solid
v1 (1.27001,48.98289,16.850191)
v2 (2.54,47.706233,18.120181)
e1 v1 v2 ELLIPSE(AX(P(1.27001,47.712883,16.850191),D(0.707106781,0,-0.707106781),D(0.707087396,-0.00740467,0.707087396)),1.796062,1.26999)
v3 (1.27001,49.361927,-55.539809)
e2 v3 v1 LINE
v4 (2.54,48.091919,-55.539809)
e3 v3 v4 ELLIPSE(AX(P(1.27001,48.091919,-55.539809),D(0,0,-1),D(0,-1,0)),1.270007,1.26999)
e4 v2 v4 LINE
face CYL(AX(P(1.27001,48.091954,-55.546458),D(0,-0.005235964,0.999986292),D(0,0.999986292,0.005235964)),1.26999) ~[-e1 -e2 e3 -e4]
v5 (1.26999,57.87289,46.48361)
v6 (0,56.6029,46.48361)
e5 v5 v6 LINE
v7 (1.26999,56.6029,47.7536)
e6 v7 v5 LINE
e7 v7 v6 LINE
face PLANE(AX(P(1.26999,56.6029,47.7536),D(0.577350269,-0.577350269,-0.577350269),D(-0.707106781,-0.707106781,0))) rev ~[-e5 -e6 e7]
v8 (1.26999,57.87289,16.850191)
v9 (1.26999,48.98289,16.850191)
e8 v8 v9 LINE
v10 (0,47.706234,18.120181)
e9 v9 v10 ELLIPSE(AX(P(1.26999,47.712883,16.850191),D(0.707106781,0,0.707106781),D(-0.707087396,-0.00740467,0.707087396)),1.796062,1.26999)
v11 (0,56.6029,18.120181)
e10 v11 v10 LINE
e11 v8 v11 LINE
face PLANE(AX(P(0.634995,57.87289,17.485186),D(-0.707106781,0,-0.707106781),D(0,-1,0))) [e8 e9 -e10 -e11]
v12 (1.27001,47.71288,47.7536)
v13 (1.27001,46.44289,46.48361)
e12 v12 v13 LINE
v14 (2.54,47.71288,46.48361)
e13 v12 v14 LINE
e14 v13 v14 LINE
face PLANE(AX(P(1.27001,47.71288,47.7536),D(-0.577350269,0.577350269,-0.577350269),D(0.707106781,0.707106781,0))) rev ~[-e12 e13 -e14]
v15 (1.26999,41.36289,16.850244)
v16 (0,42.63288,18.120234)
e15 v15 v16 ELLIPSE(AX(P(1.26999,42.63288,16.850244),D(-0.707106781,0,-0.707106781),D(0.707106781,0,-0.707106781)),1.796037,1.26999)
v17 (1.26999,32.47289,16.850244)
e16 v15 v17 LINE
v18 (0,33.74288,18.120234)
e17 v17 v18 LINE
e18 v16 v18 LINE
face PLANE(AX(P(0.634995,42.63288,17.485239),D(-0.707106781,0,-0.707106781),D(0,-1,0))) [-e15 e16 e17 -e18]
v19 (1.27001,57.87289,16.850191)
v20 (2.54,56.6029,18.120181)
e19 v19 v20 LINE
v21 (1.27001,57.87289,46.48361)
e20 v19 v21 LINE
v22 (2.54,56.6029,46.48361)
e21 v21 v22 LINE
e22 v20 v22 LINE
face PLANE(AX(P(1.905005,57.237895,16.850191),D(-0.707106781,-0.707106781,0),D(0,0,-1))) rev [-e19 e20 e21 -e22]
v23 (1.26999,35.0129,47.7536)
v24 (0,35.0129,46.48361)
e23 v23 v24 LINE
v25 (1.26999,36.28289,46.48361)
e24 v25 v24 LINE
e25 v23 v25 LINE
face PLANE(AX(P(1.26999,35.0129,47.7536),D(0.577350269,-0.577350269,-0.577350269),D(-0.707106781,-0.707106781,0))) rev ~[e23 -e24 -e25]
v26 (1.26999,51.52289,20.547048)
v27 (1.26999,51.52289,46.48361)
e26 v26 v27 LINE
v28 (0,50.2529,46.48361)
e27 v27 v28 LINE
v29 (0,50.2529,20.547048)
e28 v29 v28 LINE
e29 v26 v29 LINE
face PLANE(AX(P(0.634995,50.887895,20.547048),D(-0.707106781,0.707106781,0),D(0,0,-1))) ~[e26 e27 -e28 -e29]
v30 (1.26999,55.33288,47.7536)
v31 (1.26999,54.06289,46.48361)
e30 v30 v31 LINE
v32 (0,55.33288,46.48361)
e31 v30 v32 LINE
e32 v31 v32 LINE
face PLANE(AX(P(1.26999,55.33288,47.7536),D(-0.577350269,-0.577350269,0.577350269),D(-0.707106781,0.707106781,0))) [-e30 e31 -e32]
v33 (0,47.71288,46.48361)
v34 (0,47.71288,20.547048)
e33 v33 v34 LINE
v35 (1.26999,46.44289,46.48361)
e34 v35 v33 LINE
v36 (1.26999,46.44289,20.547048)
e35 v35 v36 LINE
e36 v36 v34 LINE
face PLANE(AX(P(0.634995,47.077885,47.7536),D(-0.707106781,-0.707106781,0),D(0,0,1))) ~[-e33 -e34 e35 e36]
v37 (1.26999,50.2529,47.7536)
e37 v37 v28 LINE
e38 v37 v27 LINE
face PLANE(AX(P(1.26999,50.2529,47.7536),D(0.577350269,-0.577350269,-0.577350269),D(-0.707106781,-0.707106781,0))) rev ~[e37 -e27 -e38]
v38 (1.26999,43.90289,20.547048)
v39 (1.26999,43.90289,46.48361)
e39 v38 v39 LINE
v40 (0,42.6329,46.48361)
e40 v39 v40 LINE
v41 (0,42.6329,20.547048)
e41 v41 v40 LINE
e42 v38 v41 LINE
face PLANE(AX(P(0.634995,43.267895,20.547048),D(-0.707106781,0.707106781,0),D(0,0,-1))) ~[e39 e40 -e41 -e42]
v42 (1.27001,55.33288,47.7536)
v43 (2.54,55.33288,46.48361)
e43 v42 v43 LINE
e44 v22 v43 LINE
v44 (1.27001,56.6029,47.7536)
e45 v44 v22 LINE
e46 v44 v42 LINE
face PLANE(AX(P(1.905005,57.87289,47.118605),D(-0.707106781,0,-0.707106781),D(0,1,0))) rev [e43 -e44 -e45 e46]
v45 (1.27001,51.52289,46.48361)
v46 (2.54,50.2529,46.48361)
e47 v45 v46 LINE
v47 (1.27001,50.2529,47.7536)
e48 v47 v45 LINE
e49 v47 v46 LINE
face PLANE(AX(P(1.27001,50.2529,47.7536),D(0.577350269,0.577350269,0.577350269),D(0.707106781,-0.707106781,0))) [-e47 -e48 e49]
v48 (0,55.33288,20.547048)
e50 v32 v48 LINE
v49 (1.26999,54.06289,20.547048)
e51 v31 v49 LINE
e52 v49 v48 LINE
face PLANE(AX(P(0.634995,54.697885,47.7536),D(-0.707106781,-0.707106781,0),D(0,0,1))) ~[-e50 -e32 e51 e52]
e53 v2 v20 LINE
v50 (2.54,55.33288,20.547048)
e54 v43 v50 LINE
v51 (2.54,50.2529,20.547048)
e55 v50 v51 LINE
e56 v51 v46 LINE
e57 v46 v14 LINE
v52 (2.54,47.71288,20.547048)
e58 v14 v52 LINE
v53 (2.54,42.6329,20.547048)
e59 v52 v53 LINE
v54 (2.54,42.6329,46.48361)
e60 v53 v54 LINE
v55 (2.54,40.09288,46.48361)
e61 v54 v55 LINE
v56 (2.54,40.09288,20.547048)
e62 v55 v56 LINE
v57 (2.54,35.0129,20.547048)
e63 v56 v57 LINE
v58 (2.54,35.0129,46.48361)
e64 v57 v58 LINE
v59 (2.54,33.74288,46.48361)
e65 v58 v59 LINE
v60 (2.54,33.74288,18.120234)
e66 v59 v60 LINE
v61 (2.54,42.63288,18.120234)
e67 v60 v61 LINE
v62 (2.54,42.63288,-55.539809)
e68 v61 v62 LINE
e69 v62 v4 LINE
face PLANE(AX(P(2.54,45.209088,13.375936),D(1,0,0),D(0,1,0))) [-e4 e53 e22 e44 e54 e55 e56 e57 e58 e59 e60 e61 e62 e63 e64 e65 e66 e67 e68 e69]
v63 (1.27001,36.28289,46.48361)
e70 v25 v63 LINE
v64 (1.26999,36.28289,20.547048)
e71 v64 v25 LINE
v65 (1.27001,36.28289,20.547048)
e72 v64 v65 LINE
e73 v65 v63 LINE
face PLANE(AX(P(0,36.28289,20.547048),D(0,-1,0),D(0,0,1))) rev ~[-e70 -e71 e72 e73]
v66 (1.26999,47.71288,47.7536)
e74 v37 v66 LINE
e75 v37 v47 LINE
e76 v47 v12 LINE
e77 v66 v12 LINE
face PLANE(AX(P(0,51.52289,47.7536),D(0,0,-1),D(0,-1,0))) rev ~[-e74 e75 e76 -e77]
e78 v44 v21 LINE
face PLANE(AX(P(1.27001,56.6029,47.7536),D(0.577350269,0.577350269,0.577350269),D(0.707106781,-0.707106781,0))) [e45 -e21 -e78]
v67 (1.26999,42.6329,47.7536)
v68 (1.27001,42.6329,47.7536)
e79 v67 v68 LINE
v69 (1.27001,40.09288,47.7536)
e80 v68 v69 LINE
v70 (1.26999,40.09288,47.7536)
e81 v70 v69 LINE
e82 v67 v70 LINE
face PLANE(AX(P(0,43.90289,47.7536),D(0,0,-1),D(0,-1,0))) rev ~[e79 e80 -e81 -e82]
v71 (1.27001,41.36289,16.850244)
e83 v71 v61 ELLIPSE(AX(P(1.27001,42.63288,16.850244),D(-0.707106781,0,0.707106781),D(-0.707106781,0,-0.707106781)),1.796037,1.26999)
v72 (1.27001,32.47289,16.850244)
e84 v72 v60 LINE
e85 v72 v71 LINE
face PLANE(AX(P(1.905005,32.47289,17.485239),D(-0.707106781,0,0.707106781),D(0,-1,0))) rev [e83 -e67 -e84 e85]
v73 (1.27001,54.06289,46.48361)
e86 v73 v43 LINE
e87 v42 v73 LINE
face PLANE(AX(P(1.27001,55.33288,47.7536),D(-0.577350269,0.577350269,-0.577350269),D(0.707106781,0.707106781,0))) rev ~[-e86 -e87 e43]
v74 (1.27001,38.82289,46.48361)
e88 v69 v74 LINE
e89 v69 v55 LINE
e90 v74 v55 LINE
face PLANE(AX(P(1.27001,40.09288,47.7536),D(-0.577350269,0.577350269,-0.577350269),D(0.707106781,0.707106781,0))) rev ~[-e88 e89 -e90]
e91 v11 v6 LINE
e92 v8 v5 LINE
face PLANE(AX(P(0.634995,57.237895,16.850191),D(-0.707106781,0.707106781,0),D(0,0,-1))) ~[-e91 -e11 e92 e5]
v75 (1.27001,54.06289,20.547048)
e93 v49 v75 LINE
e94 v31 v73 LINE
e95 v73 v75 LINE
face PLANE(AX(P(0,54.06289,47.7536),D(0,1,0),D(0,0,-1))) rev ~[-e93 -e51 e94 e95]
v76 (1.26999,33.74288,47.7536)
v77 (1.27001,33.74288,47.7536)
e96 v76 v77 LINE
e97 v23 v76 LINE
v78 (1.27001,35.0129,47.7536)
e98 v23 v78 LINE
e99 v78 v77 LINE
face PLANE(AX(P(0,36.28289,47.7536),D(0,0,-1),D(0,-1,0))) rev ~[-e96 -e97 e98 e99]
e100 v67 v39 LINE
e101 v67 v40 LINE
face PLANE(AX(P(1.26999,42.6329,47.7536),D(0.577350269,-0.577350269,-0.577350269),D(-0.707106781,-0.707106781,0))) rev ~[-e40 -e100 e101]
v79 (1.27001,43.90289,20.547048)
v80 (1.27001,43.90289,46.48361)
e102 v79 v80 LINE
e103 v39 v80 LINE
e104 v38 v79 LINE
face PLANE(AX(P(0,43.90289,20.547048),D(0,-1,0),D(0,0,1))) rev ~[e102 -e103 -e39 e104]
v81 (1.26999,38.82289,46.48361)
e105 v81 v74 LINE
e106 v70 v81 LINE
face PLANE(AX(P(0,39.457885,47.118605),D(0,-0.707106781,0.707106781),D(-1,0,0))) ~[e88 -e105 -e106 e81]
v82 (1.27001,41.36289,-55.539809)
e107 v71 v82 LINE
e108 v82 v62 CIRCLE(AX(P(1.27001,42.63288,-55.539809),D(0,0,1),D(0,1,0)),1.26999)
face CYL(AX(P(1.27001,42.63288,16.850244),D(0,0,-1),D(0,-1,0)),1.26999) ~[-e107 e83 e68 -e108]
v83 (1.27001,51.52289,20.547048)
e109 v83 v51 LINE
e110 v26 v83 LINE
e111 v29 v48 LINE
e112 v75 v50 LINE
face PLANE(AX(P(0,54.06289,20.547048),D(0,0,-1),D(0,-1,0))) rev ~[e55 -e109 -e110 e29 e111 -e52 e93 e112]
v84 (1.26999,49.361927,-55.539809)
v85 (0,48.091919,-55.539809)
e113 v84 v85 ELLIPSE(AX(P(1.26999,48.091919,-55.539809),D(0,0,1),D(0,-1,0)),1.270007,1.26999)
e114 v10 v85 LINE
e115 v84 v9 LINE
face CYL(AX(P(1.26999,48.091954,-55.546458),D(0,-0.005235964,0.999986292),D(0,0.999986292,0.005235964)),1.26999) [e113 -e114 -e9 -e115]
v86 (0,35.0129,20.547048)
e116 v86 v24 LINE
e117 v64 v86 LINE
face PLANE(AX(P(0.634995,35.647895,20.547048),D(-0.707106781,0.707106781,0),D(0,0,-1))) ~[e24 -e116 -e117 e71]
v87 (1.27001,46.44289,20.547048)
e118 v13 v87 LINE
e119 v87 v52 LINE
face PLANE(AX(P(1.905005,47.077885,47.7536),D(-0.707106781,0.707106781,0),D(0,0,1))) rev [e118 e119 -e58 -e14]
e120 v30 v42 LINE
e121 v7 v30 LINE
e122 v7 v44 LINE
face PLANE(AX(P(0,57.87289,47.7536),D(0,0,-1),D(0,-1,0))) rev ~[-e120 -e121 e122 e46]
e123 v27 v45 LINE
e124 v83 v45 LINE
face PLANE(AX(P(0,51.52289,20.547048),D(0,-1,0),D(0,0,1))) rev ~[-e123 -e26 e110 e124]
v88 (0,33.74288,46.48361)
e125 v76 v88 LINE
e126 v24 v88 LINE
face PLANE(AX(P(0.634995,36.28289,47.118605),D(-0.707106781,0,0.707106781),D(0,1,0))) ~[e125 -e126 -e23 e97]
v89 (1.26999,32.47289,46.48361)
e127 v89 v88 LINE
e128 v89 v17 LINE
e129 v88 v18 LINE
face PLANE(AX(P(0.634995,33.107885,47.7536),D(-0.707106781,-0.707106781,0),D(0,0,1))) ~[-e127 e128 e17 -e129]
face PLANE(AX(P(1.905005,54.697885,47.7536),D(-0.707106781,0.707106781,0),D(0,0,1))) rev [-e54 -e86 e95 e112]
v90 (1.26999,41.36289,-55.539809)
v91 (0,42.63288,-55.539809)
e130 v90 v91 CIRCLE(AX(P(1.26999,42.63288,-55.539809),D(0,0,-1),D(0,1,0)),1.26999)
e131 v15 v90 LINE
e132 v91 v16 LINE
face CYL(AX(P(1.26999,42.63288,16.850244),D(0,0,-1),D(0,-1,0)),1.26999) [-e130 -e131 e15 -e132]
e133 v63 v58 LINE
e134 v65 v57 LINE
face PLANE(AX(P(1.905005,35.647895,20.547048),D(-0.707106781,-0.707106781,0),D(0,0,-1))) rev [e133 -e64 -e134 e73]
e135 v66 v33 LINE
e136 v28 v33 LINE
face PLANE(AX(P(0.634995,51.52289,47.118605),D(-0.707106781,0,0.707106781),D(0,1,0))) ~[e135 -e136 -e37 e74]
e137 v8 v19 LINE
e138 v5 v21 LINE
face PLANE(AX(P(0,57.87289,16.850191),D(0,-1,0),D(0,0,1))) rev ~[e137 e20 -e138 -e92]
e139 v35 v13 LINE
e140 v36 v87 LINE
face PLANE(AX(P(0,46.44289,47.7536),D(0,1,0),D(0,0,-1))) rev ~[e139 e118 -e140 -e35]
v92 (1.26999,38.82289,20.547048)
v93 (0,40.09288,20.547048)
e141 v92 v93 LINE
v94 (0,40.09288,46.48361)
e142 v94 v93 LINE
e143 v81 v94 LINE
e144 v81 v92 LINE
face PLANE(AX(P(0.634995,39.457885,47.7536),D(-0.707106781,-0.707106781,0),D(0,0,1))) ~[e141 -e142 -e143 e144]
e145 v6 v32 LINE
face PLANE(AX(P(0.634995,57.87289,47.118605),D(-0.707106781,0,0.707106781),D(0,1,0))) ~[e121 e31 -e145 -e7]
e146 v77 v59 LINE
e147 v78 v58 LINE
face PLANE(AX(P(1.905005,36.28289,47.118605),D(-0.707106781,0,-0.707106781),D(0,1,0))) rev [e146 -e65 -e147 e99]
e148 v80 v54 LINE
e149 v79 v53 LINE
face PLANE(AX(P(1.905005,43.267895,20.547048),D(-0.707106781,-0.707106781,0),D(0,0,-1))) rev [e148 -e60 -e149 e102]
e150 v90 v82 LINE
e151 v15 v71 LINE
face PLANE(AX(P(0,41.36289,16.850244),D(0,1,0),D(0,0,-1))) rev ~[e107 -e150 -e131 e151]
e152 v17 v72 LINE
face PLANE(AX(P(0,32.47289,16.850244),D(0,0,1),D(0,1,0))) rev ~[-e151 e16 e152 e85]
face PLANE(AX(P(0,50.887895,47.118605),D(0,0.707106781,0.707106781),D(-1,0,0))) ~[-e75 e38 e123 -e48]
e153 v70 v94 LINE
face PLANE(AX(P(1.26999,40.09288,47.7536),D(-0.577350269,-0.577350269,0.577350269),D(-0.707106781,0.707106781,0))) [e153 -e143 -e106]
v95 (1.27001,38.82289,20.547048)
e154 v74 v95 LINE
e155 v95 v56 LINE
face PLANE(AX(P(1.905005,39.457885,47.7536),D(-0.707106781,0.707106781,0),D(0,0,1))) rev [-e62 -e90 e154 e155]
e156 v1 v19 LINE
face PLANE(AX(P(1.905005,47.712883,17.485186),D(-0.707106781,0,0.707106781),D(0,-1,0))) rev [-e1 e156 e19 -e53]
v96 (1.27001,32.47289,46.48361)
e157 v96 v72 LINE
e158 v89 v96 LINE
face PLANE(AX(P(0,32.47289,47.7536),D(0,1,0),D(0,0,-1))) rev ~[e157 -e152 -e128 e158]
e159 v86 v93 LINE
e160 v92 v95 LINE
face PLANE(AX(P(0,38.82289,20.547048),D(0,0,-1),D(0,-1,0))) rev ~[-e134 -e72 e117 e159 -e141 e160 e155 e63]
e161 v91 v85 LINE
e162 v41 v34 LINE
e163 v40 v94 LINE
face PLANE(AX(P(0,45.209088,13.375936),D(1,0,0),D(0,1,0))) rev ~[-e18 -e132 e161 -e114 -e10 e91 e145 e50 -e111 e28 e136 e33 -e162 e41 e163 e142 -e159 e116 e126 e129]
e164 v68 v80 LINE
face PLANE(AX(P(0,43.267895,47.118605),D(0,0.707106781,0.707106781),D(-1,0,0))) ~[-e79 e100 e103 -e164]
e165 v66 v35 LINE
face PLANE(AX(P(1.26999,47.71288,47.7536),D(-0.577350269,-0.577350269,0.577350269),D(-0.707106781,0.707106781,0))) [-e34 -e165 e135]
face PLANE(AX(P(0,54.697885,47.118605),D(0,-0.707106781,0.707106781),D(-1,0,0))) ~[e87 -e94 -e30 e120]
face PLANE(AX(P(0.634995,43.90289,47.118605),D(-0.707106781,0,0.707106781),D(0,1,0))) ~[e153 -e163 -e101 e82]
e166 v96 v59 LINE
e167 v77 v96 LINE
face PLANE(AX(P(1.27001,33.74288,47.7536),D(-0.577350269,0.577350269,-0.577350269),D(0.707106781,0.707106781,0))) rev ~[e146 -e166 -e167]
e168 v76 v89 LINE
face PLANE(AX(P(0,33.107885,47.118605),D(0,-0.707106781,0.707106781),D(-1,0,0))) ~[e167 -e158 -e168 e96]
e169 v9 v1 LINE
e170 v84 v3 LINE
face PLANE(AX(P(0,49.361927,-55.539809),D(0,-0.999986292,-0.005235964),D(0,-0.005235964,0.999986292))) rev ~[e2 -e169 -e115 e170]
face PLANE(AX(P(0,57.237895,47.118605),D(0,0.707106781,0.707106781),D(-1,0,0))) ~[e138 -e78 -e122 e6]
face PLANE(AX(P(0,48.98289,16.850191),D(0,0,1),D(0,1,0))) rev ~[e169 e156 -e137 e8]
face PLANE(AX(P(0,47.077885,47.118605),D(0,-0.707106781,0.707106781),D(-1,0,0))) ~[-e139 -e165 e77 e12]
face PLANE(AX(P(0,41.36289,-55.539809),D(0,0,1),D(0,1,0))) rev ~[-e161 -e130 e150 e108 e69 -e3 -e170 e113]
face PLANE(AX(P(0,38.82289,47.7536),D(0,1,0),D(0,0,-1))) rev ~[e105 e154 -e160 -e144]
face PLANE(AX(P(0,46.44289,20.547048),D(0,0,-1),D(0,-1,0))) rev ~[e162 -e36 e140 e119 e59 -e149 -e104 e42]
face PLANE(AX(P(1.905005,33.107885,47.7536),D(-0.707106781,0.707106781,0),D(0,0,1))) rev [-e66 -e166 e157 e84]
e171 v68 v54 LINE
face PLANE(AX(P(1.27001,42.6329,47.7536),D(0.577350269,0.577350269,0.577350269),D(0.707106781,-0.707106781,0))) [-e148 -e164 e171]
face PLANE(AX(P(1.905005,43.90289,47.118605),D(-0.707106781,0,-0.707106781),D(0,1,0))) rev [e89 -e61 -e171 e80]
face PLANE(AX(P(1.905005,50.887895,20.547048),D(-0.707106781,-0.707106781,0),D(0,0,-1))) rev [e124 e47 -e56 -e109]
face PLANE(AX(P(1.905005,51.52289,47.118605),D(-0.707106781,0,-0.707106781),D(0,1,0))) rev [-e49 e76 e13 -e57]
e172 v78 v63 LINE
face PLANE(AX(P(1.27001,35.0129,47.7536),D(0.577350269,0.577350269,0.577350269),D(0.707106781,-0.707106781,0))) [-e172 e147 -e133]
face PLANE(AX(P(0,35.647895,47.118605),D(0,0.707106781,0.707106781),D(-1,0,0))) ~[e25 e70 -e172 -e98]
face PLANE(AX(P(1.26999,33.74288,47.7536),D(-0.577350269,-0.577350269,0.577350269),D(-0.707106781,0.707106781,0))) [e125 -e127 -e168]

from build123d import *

# Parameters (mm, degrees)
F1_DEPTH = 2.54
F2_R     = 1.26999
F3_SIZE  = 1.26999


# Not quite as in the source:
# - a fillet or chamfer is up to 0.001 mm smaller than in the source, because OpenCascade refuses the exact size


with BuildPart() as f1:
    # F0 (on Right) → F1 (new body)
    with BuildSketch(Plane.YZ):
        Polygon((41.3628902497, -55.5398087384), (48.9828902497, -55.5398087384), (49.3619268672, -55.5398087384), (48.9828902497, 16.8501912616), (57.8728902497, 16.8501912616), (57.8728902497, 20.5470483008), (57.8728902497, 47.7535999747), (54.0628902497, 47.7535999747), (54.0628902497, 20.5470483008), (51.5228902497, 20.5470483008), (51.5228902497, 47.7535999747), (46.4428902497, 47.7535999747), (46.4428902497, 20.5470483008), (43.9028902497, 20.5470483008), (43.9028902497, 47.7535999747), (38.8228902497, 47.7535999747), (38.8228902497, 20.5470483008), (36.2828902497, 20.5470483008), (36.2828902497, 47.7535999747), (32.4728902497, 47.7535999747), (32.4728902497, 16.8502441253), (41.3628902497, 16.8502441253), align=None)
    extrude(amount=F1_DEPTH)

    # F2 (radius 1.27 in the source; OpenCascade refuses exactly that, so slightly less here)
    f2_edges = [f1.edges().sort_by_distance(p)[0] for p in [
        (0, 49.172409, -19.344809),
        (2.54, 41.36289, -19.344782),
        (0, 41.36289, -19.344782),
        (2.54, 49.172409, -19.344809),
    ]]
    fillet(f2_edges, radius=F2_R)

    # F3 (size 1.27 in the source; OpenCascade refuses exactly that, so slightly less here)
    f3_edges = [f1.edges().sort_by_distance(p)[0] for p in [
        (0, 53.42789, 16.850191),
        (2.54, 53.42789, 16.850191),
        (0, 36.91789, 16.850244),
        (2.54, 36.91789, 16.850244),
        (0, 57.87289, 32.301896),
        (2.54, 57.87289, 32.301896),
        (2.54, 54.06289, 34.150324),
        (0, 54.06289, 34.150324),
        (2.54, 36.28289, 34.150324),
        (0, 36.28289, 34.150324),
        (2.54, 43.90289, 34.150324),
        (0, 43.90289, 34.150324),
        (2.54, 51.52289, 34.150324),
        (0, 51.52289, 34.150324),
        (2.54, 32.47289, 32.301922),
        (0, 32.47289, 32.301922),
        (2.54, 38.82289, 34.150324),
        (0, 38.82289, 34.150324),
        (2.54, 46.44289, 34.150324),
        (0, 46.44289, 34.150324),
        (1.27, 51.52289, 47.7536),
        (1.27, 46.44289, 47.7536),
        (0, 48.98289, 47.7536),
        (2.54, 48.98289, 47.7536),
        (1.27, 43.90289, 47.7536),
        (1.27, 38.82289, 47.7536),
        (0, 41.36289, 47.7536),
        (2.54, 41.36289, 47.7536),
        (1.27, 36.28289, 47.7536),
        (1.27, 32.47289, 47.7536),
        (0, 34.37789, 47.7536),
        (2.54, 34.37789, 47.7536),
        (1.27, 57.87289, 47.7536),
        (1.27, 54.06289, 47.7536),
        (0, 55.96789, 47.7536),
        (2.54, 55.96789, 47.7536),
    ]]
    chamfer(f3_edges, length=F3_SIZE)


solid = f1.part
